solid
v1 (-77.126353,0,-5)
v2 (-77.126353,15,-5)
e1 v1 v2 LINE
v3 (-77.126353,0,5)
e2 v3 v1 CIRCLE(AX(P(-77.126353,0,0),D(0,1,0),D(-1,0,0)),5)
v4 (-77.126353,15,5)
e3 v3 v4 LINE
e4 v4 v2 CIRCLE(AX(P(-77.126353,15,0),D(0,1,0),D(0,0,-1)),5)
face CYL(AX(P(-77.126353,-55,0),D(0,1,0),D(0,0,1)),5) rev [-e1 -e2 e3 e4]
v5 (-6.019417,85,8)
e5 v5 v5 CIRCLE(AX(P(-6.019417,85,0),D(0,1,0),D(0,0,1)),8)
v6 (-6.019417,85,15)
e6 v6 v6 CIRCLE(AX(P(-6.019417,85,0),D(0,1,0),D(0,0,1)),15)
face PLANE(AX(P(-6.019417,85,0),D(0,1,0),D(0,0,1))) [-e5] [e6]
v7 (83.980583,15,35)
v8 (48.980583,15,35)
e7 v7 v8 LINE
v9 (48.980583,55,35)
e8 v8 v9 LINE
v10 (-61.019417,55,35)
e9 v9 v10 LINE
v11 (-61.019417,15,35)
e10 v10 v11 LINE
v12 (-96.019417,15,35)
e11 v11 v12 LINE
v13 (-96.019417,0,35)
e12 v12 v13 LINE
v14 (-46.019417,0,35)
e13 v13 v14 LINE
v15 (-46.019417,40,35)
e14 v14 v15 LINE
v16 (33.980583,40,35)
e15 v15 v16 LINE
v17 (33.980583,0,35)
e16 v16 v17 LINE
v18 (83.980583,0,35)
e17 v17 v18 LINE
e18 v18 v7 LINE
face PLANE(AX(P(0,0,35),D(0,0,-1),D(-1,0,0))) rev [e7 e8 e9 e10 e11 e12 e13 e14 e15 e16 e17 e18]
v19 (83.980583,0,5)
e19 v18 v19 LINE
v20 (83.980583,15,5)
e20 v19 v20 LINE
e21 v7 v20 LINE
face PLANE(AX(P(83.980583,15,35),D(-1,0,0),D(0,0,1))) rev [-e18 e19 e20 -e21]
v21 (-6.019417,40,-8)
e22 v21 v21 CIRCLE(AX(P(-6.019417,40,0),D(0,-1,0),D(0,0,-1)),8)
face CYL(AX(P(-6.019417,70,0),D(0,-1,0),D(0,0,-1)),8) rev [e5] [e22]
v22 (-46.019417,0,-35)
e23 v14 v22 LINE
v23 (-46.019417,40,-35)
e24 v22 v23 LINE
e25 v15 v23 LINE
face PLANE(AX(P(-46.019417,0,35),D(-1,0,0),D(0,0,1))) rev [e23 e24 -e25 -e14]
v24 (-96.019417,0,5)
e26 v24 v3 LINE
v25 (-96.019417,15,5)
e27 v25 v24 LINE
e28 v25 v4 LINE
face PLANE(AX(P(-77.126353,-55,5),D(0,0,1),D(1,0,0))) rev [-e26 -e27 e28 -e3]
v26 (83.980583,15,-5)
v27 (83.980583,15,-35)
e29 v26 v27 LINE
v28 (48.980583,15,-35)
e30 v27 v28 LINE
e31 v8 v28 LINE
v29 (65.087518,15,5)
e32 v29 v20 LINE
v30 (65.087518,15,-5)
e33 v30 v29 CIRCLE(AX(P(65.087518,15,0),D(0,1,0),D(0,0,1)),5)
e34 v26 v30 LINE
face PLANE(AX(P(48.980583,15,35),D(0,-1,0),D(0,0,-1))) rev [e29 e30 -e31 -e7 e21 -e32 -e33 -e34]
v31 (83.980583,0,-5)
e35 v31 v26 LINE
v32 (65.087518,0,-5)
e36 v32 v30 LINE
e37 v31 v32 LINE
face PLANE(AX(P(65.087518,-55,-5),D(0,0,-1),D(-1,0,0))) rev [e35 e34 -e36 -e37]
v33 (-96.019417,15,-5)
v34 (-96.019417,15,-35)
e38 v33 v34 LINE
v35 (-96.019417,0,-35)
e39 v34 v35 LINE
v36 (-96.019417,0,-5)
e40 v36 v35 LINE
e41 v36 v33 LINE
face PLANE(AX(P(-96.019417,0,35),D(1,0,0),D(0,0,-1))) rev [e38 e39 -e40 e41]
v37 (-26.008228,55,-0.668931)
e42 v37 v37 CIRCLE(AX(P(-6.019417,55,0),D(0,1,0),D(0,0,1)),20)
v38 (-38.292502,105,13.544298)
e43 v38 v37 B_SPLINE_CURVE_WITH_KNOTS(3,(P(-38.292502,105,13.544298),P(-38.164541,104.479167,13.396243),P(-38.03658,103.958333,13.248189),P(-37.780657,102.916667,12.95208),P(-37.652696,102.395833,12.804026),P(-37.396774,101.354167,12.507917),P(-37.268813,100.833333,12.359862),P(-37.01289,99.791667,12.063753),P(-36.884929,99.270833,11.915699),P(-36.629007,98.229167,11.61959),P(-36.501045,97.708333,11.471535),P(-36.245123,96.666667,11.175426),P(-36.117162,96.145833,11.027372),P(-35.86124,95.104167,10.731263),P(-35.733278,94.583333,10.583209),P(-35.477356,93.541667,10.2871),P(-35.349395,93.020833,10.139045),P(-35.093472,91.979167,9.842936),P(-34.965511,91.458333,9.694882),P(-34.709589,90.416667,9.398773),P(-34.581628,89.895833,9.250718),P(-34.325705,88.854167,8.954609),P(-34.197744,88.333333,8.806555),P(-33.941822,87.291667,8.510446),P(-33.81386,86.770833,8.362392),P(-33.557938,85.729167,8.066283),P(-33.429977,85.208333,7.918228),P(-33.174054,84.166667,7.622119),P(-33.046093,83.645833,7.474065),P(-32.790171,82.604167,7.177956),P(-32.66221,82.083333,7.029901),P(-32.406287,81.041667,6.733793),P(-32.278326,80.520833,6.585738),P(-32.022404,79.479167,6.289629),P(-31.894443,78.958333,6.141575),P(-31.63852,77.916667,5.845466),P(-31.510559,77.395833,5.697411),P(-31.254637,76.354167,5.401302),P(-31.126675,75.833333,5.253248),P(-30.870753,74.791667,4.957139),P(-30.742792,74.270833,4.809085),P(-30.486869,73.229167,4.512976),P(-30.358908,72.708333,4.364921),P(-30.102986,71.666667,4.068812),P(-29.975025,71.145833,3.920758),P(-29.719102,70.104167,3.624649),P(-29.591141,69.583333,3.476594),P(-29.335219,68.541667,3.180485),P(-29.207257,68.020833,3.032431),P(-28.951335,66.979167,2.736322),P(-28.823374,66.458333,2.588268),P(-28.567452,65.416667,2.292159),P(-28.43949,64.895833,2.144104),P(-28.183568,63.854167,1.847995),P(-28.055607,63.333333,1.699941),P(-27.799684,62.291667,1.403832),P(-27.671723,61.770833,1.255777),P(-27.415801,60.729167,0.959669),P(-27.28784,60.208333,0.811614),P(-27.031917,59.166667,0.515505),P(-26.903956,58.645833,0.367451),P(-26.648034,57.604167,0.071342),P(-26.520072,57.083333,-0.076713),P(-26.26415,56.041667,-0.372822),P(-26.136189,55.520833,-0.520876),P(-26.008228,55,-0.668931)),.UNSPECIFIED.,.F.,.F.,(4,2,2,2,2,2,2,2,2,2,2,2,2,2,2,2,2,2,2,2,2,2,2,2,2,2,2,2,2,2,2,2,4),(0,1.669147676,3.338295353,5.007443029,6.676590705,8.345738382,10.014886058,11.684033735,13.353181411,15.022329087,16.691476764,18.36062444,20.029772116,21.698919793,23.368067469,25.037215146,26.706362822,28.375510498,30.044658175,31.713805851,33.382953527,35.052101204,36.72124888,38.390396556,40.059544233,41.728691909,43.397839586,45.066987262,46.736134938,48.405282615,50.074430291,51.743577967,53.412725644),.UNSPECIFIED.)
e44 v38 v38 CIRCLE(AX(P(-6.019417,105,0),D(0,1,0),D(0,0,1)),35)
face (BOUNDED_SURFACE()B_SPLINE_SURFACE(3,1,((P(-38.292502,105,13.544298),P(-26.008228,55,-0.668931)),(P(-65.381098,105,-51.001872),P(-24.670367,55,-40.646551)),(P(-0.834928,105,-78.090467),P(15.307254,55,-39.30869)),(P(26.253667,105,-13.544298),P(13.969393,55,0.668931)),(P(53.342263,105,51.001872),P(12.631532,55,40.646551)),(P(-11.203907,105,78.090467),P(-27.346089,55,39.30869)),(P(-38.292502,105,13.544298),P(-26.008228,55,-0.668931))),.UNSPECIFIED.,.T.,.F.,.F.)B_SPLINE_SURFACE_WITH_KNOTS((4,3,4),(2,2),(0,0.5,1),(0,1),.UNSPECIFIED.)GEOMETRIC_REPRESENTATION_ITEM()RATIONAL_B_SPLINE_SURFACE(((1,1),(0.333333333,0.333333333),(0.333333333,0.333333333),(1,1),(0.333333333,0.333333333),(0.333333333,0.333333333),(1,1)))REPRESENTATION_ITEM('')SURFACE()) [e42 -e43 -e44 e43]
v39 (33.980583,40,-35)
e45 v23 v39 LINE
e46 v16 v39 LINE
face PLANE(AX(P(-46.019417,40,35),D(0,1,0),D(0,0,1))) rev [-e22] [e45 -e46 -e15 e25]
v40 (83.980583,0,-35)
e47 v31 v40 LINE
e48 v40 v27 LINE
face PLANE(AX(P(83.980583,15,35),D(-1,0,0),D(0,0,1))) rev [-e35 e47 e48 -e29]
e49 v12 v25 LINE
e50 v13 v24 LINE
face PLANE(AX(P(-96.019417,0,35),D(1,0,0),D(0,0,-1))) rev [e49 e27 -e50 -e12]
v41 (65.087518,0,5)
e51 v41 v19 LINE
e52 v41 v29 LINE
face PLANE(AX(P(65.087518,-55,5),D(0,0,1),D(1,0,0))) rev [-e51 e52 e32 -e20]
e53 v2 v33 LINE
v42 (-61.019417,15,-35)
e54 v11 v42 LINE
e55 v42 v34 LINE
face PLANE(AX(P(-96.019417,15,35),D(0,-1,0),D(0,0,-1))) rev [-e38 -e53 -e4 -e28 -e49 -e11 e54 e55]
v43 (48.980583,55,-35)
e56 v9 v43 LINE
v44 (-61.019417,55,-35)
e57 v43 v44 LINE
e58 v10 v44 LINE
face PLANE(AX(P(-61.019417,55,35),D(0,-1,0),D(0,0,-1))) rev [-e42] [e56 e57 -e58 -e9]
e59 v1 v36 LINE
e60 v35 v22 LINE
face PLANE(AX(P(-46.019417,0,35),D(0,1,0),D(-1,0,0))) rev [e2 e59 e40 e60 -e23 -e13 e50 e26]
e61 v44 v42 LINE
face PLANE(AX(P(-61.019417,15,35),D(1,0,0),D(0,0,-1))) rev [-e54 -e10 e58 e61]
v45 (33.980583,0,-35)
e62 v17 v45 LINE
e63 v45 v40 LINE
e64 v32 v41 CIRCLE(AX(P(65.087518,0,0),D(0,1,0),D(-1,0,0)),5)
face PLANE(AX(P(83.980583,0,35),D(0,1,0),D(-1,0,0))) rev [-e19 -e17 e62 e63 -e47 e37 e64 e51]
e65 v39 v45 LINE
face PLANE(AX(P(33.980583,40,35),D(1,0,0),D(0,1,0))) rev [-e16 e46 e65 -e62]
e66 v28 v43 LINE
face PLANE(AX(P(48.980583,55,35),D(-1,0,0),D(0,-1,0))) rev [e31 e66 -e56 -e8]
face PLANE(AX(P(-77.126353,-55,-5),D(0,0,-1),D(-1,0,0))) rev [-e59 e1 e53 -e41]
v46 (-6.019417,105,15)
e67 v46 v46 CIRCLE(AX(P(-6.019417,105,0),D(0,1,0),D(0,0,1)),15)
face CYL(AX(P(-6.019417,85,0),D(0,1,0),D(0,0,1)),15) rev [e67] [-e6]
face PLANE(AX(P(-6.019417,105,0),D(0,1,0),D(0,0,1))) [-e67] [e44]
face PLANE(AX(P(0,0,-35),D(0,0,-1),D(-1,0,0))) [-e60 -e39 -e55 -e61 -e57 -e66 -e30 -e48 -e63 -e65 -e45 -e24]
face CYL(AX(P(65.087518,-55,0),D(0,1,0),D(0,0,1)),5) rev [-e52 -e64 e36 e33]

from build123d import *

# Parameters (mm, degrees)
BOSS_EXTRUDE1_DEPTH = 35
CUT_EXTRUDE1_DEPTH  = 70
SKETCH11_R          = 15
CUT_EXTRUDE2_DEPTH  = 20
SKETCH12_R          = 8
CUT_EXTRUDE3_DEPTH  = 30
CUT_EXTRUDE4_START  = -30
SKETCH13_R          = 8
CUT_EXTRUDE4_DEPTH  = 30


with BuildPart() as part:
    # Sketch1 → Boss-Extrude1 (new, symmetric)
    with BuildSketch(Plane.XY):
        Polygon((-46.019417476, 0), (-46.019417476, 40), (33.980582524, 40), (33.980582524, 0), (83.980582524, 0), (83.980582524, 15), (48.980582524, 15), (48.980582524, 55), (-61.019417476, 55), (-61.019417476, 15), (-96.019417476, 15), (-96.019417476, 0), align=None)
    extrude(amount=BOSS_EXTRUDE1_DEPTH, both=True)

    # Sketch2 → Cut-Extrude1 (cut)
    with BuildSketch(Plane(origin=(0, 15, 0), x_dir=(1, 0, 0), z_dir=(0, 1, 0))):
        with BuildLine():
            Line((65.087517656, 5), (83.980582524, 5))
            Line((83.980582524, 5), (83.980582524, -5))
            Line((83.980582524, -5), (65.087517656, -5))
            ThreePointArc((65.087517656, -5), (60.087517656, 0), (65.087517656, 5))
        make_face()
        with BuildLine():
            Line((-96.019417476, -5), (-96.019417476, 5))
            Line((-96.019417476, 5), (-77.126352608, 5))
            ThreePointArc((-77.126352608, 5), (-72.126352608, 0), (-77.126352608, -5))
            Line((-77.126352608, -5), (-96.019417476, -5))
        make_face()
    extrude(amount=-CUT_EXTRUDE1_DEPTH, mode=Mode.SUBTRACT)

    # Loft1: read off the stored shape, not the designer's step
    # Loft1: loft between two sections, ruled curve by curve
    loft1_from = [
        Edge.make_bspline([(-38.292502188, 105, 13.54429781), (-65.381097807, 105, -51.001871615), (-0.834928382, 105, -78.090467234), (26.253667237, 105, -13.54429781), (53.342262856, 105, 51.001871615), (-11.203906569, 105, 78.090467234), (-38.292502188, 105, 13.54429781)], [0, 0, 0, 0, 0.5, 0.5, 0.5, 1, 1, 1, 1], 3, [1, 0.333333333, 0.333333333, 1, 0.333333333, 0.333333333, 1]),
    ]
    loft1_to = [
        Edge.make_bspline([(-26.008227644, 55, -0.668930523), (-24.670366599, 55, -40.64655086), (15.307253739, 55, -39.308689814), (13.969392693, 55, 0.668930523), (12.631531647, 55, 40.64655086), (-27.34608869, 55, 39.308689814), (-26.008227644, 55, -0.668930523)], [0, 0, 0, 0, 0.5, 0.5, 0.5, 1, 1, 1, 1], 3, [1, 0.333333333, 0.333333333, 1, 0.333333333, 0.333333333, 1]),
    ]
    loft1 = Solid(Shell([*[Face.make_surface_from_curves(loft1_from[k], loft1_to[k]) for k in range(1)], Face(Wire(loft1_from)), Face(Wire(loft1_to))]))
    add(loft1)

    # Sketch11 → Cut-Extrude2 (cut)
    with BuildSketch(Plane(origin=(0, 105, 0), x_dir=(1, 0, 0), z_dir=(0, 1, 0))):
        with Locations(Location((-6.019417476, 0, 0), (0, 0, 270))):
            Circle(SKETCH11_R)
    extrude(amount=-CUT_EXTRUDE2_DEPTH, mode=Mode.SUBTRACT)

    # Sketch12 → Cut-Extrude3 (cut)
    with BuildSketch(Plane.XZ.offset(-40)):
        with Locations(Location((-6.019417476, 0, 0), (0, 0, 270))):
            Circle(SKETCH12_R)
    extrude(amount=-CUT_EXTRUDE3_DEPTH, mode=Mode.SUBTRACT)

    # Sketch13 → Cut-Extrude4 (cut)
    with BuildSketch(Plane(origin=(0, 85, 0), x_dir=(1, 0, 0), z_dir=(0, 1, 0)).offset(CUT_EXTRUDE4_START)):
        with Locations(Location((-6.019417476, 0, 0), (0, 0, 90))):
            Circle(SKETCH13_R)
    extrude(amount=CUT_EXTRUDE4_DEPTH, mode=Mode.SUBTRACT)


solid = part.part
